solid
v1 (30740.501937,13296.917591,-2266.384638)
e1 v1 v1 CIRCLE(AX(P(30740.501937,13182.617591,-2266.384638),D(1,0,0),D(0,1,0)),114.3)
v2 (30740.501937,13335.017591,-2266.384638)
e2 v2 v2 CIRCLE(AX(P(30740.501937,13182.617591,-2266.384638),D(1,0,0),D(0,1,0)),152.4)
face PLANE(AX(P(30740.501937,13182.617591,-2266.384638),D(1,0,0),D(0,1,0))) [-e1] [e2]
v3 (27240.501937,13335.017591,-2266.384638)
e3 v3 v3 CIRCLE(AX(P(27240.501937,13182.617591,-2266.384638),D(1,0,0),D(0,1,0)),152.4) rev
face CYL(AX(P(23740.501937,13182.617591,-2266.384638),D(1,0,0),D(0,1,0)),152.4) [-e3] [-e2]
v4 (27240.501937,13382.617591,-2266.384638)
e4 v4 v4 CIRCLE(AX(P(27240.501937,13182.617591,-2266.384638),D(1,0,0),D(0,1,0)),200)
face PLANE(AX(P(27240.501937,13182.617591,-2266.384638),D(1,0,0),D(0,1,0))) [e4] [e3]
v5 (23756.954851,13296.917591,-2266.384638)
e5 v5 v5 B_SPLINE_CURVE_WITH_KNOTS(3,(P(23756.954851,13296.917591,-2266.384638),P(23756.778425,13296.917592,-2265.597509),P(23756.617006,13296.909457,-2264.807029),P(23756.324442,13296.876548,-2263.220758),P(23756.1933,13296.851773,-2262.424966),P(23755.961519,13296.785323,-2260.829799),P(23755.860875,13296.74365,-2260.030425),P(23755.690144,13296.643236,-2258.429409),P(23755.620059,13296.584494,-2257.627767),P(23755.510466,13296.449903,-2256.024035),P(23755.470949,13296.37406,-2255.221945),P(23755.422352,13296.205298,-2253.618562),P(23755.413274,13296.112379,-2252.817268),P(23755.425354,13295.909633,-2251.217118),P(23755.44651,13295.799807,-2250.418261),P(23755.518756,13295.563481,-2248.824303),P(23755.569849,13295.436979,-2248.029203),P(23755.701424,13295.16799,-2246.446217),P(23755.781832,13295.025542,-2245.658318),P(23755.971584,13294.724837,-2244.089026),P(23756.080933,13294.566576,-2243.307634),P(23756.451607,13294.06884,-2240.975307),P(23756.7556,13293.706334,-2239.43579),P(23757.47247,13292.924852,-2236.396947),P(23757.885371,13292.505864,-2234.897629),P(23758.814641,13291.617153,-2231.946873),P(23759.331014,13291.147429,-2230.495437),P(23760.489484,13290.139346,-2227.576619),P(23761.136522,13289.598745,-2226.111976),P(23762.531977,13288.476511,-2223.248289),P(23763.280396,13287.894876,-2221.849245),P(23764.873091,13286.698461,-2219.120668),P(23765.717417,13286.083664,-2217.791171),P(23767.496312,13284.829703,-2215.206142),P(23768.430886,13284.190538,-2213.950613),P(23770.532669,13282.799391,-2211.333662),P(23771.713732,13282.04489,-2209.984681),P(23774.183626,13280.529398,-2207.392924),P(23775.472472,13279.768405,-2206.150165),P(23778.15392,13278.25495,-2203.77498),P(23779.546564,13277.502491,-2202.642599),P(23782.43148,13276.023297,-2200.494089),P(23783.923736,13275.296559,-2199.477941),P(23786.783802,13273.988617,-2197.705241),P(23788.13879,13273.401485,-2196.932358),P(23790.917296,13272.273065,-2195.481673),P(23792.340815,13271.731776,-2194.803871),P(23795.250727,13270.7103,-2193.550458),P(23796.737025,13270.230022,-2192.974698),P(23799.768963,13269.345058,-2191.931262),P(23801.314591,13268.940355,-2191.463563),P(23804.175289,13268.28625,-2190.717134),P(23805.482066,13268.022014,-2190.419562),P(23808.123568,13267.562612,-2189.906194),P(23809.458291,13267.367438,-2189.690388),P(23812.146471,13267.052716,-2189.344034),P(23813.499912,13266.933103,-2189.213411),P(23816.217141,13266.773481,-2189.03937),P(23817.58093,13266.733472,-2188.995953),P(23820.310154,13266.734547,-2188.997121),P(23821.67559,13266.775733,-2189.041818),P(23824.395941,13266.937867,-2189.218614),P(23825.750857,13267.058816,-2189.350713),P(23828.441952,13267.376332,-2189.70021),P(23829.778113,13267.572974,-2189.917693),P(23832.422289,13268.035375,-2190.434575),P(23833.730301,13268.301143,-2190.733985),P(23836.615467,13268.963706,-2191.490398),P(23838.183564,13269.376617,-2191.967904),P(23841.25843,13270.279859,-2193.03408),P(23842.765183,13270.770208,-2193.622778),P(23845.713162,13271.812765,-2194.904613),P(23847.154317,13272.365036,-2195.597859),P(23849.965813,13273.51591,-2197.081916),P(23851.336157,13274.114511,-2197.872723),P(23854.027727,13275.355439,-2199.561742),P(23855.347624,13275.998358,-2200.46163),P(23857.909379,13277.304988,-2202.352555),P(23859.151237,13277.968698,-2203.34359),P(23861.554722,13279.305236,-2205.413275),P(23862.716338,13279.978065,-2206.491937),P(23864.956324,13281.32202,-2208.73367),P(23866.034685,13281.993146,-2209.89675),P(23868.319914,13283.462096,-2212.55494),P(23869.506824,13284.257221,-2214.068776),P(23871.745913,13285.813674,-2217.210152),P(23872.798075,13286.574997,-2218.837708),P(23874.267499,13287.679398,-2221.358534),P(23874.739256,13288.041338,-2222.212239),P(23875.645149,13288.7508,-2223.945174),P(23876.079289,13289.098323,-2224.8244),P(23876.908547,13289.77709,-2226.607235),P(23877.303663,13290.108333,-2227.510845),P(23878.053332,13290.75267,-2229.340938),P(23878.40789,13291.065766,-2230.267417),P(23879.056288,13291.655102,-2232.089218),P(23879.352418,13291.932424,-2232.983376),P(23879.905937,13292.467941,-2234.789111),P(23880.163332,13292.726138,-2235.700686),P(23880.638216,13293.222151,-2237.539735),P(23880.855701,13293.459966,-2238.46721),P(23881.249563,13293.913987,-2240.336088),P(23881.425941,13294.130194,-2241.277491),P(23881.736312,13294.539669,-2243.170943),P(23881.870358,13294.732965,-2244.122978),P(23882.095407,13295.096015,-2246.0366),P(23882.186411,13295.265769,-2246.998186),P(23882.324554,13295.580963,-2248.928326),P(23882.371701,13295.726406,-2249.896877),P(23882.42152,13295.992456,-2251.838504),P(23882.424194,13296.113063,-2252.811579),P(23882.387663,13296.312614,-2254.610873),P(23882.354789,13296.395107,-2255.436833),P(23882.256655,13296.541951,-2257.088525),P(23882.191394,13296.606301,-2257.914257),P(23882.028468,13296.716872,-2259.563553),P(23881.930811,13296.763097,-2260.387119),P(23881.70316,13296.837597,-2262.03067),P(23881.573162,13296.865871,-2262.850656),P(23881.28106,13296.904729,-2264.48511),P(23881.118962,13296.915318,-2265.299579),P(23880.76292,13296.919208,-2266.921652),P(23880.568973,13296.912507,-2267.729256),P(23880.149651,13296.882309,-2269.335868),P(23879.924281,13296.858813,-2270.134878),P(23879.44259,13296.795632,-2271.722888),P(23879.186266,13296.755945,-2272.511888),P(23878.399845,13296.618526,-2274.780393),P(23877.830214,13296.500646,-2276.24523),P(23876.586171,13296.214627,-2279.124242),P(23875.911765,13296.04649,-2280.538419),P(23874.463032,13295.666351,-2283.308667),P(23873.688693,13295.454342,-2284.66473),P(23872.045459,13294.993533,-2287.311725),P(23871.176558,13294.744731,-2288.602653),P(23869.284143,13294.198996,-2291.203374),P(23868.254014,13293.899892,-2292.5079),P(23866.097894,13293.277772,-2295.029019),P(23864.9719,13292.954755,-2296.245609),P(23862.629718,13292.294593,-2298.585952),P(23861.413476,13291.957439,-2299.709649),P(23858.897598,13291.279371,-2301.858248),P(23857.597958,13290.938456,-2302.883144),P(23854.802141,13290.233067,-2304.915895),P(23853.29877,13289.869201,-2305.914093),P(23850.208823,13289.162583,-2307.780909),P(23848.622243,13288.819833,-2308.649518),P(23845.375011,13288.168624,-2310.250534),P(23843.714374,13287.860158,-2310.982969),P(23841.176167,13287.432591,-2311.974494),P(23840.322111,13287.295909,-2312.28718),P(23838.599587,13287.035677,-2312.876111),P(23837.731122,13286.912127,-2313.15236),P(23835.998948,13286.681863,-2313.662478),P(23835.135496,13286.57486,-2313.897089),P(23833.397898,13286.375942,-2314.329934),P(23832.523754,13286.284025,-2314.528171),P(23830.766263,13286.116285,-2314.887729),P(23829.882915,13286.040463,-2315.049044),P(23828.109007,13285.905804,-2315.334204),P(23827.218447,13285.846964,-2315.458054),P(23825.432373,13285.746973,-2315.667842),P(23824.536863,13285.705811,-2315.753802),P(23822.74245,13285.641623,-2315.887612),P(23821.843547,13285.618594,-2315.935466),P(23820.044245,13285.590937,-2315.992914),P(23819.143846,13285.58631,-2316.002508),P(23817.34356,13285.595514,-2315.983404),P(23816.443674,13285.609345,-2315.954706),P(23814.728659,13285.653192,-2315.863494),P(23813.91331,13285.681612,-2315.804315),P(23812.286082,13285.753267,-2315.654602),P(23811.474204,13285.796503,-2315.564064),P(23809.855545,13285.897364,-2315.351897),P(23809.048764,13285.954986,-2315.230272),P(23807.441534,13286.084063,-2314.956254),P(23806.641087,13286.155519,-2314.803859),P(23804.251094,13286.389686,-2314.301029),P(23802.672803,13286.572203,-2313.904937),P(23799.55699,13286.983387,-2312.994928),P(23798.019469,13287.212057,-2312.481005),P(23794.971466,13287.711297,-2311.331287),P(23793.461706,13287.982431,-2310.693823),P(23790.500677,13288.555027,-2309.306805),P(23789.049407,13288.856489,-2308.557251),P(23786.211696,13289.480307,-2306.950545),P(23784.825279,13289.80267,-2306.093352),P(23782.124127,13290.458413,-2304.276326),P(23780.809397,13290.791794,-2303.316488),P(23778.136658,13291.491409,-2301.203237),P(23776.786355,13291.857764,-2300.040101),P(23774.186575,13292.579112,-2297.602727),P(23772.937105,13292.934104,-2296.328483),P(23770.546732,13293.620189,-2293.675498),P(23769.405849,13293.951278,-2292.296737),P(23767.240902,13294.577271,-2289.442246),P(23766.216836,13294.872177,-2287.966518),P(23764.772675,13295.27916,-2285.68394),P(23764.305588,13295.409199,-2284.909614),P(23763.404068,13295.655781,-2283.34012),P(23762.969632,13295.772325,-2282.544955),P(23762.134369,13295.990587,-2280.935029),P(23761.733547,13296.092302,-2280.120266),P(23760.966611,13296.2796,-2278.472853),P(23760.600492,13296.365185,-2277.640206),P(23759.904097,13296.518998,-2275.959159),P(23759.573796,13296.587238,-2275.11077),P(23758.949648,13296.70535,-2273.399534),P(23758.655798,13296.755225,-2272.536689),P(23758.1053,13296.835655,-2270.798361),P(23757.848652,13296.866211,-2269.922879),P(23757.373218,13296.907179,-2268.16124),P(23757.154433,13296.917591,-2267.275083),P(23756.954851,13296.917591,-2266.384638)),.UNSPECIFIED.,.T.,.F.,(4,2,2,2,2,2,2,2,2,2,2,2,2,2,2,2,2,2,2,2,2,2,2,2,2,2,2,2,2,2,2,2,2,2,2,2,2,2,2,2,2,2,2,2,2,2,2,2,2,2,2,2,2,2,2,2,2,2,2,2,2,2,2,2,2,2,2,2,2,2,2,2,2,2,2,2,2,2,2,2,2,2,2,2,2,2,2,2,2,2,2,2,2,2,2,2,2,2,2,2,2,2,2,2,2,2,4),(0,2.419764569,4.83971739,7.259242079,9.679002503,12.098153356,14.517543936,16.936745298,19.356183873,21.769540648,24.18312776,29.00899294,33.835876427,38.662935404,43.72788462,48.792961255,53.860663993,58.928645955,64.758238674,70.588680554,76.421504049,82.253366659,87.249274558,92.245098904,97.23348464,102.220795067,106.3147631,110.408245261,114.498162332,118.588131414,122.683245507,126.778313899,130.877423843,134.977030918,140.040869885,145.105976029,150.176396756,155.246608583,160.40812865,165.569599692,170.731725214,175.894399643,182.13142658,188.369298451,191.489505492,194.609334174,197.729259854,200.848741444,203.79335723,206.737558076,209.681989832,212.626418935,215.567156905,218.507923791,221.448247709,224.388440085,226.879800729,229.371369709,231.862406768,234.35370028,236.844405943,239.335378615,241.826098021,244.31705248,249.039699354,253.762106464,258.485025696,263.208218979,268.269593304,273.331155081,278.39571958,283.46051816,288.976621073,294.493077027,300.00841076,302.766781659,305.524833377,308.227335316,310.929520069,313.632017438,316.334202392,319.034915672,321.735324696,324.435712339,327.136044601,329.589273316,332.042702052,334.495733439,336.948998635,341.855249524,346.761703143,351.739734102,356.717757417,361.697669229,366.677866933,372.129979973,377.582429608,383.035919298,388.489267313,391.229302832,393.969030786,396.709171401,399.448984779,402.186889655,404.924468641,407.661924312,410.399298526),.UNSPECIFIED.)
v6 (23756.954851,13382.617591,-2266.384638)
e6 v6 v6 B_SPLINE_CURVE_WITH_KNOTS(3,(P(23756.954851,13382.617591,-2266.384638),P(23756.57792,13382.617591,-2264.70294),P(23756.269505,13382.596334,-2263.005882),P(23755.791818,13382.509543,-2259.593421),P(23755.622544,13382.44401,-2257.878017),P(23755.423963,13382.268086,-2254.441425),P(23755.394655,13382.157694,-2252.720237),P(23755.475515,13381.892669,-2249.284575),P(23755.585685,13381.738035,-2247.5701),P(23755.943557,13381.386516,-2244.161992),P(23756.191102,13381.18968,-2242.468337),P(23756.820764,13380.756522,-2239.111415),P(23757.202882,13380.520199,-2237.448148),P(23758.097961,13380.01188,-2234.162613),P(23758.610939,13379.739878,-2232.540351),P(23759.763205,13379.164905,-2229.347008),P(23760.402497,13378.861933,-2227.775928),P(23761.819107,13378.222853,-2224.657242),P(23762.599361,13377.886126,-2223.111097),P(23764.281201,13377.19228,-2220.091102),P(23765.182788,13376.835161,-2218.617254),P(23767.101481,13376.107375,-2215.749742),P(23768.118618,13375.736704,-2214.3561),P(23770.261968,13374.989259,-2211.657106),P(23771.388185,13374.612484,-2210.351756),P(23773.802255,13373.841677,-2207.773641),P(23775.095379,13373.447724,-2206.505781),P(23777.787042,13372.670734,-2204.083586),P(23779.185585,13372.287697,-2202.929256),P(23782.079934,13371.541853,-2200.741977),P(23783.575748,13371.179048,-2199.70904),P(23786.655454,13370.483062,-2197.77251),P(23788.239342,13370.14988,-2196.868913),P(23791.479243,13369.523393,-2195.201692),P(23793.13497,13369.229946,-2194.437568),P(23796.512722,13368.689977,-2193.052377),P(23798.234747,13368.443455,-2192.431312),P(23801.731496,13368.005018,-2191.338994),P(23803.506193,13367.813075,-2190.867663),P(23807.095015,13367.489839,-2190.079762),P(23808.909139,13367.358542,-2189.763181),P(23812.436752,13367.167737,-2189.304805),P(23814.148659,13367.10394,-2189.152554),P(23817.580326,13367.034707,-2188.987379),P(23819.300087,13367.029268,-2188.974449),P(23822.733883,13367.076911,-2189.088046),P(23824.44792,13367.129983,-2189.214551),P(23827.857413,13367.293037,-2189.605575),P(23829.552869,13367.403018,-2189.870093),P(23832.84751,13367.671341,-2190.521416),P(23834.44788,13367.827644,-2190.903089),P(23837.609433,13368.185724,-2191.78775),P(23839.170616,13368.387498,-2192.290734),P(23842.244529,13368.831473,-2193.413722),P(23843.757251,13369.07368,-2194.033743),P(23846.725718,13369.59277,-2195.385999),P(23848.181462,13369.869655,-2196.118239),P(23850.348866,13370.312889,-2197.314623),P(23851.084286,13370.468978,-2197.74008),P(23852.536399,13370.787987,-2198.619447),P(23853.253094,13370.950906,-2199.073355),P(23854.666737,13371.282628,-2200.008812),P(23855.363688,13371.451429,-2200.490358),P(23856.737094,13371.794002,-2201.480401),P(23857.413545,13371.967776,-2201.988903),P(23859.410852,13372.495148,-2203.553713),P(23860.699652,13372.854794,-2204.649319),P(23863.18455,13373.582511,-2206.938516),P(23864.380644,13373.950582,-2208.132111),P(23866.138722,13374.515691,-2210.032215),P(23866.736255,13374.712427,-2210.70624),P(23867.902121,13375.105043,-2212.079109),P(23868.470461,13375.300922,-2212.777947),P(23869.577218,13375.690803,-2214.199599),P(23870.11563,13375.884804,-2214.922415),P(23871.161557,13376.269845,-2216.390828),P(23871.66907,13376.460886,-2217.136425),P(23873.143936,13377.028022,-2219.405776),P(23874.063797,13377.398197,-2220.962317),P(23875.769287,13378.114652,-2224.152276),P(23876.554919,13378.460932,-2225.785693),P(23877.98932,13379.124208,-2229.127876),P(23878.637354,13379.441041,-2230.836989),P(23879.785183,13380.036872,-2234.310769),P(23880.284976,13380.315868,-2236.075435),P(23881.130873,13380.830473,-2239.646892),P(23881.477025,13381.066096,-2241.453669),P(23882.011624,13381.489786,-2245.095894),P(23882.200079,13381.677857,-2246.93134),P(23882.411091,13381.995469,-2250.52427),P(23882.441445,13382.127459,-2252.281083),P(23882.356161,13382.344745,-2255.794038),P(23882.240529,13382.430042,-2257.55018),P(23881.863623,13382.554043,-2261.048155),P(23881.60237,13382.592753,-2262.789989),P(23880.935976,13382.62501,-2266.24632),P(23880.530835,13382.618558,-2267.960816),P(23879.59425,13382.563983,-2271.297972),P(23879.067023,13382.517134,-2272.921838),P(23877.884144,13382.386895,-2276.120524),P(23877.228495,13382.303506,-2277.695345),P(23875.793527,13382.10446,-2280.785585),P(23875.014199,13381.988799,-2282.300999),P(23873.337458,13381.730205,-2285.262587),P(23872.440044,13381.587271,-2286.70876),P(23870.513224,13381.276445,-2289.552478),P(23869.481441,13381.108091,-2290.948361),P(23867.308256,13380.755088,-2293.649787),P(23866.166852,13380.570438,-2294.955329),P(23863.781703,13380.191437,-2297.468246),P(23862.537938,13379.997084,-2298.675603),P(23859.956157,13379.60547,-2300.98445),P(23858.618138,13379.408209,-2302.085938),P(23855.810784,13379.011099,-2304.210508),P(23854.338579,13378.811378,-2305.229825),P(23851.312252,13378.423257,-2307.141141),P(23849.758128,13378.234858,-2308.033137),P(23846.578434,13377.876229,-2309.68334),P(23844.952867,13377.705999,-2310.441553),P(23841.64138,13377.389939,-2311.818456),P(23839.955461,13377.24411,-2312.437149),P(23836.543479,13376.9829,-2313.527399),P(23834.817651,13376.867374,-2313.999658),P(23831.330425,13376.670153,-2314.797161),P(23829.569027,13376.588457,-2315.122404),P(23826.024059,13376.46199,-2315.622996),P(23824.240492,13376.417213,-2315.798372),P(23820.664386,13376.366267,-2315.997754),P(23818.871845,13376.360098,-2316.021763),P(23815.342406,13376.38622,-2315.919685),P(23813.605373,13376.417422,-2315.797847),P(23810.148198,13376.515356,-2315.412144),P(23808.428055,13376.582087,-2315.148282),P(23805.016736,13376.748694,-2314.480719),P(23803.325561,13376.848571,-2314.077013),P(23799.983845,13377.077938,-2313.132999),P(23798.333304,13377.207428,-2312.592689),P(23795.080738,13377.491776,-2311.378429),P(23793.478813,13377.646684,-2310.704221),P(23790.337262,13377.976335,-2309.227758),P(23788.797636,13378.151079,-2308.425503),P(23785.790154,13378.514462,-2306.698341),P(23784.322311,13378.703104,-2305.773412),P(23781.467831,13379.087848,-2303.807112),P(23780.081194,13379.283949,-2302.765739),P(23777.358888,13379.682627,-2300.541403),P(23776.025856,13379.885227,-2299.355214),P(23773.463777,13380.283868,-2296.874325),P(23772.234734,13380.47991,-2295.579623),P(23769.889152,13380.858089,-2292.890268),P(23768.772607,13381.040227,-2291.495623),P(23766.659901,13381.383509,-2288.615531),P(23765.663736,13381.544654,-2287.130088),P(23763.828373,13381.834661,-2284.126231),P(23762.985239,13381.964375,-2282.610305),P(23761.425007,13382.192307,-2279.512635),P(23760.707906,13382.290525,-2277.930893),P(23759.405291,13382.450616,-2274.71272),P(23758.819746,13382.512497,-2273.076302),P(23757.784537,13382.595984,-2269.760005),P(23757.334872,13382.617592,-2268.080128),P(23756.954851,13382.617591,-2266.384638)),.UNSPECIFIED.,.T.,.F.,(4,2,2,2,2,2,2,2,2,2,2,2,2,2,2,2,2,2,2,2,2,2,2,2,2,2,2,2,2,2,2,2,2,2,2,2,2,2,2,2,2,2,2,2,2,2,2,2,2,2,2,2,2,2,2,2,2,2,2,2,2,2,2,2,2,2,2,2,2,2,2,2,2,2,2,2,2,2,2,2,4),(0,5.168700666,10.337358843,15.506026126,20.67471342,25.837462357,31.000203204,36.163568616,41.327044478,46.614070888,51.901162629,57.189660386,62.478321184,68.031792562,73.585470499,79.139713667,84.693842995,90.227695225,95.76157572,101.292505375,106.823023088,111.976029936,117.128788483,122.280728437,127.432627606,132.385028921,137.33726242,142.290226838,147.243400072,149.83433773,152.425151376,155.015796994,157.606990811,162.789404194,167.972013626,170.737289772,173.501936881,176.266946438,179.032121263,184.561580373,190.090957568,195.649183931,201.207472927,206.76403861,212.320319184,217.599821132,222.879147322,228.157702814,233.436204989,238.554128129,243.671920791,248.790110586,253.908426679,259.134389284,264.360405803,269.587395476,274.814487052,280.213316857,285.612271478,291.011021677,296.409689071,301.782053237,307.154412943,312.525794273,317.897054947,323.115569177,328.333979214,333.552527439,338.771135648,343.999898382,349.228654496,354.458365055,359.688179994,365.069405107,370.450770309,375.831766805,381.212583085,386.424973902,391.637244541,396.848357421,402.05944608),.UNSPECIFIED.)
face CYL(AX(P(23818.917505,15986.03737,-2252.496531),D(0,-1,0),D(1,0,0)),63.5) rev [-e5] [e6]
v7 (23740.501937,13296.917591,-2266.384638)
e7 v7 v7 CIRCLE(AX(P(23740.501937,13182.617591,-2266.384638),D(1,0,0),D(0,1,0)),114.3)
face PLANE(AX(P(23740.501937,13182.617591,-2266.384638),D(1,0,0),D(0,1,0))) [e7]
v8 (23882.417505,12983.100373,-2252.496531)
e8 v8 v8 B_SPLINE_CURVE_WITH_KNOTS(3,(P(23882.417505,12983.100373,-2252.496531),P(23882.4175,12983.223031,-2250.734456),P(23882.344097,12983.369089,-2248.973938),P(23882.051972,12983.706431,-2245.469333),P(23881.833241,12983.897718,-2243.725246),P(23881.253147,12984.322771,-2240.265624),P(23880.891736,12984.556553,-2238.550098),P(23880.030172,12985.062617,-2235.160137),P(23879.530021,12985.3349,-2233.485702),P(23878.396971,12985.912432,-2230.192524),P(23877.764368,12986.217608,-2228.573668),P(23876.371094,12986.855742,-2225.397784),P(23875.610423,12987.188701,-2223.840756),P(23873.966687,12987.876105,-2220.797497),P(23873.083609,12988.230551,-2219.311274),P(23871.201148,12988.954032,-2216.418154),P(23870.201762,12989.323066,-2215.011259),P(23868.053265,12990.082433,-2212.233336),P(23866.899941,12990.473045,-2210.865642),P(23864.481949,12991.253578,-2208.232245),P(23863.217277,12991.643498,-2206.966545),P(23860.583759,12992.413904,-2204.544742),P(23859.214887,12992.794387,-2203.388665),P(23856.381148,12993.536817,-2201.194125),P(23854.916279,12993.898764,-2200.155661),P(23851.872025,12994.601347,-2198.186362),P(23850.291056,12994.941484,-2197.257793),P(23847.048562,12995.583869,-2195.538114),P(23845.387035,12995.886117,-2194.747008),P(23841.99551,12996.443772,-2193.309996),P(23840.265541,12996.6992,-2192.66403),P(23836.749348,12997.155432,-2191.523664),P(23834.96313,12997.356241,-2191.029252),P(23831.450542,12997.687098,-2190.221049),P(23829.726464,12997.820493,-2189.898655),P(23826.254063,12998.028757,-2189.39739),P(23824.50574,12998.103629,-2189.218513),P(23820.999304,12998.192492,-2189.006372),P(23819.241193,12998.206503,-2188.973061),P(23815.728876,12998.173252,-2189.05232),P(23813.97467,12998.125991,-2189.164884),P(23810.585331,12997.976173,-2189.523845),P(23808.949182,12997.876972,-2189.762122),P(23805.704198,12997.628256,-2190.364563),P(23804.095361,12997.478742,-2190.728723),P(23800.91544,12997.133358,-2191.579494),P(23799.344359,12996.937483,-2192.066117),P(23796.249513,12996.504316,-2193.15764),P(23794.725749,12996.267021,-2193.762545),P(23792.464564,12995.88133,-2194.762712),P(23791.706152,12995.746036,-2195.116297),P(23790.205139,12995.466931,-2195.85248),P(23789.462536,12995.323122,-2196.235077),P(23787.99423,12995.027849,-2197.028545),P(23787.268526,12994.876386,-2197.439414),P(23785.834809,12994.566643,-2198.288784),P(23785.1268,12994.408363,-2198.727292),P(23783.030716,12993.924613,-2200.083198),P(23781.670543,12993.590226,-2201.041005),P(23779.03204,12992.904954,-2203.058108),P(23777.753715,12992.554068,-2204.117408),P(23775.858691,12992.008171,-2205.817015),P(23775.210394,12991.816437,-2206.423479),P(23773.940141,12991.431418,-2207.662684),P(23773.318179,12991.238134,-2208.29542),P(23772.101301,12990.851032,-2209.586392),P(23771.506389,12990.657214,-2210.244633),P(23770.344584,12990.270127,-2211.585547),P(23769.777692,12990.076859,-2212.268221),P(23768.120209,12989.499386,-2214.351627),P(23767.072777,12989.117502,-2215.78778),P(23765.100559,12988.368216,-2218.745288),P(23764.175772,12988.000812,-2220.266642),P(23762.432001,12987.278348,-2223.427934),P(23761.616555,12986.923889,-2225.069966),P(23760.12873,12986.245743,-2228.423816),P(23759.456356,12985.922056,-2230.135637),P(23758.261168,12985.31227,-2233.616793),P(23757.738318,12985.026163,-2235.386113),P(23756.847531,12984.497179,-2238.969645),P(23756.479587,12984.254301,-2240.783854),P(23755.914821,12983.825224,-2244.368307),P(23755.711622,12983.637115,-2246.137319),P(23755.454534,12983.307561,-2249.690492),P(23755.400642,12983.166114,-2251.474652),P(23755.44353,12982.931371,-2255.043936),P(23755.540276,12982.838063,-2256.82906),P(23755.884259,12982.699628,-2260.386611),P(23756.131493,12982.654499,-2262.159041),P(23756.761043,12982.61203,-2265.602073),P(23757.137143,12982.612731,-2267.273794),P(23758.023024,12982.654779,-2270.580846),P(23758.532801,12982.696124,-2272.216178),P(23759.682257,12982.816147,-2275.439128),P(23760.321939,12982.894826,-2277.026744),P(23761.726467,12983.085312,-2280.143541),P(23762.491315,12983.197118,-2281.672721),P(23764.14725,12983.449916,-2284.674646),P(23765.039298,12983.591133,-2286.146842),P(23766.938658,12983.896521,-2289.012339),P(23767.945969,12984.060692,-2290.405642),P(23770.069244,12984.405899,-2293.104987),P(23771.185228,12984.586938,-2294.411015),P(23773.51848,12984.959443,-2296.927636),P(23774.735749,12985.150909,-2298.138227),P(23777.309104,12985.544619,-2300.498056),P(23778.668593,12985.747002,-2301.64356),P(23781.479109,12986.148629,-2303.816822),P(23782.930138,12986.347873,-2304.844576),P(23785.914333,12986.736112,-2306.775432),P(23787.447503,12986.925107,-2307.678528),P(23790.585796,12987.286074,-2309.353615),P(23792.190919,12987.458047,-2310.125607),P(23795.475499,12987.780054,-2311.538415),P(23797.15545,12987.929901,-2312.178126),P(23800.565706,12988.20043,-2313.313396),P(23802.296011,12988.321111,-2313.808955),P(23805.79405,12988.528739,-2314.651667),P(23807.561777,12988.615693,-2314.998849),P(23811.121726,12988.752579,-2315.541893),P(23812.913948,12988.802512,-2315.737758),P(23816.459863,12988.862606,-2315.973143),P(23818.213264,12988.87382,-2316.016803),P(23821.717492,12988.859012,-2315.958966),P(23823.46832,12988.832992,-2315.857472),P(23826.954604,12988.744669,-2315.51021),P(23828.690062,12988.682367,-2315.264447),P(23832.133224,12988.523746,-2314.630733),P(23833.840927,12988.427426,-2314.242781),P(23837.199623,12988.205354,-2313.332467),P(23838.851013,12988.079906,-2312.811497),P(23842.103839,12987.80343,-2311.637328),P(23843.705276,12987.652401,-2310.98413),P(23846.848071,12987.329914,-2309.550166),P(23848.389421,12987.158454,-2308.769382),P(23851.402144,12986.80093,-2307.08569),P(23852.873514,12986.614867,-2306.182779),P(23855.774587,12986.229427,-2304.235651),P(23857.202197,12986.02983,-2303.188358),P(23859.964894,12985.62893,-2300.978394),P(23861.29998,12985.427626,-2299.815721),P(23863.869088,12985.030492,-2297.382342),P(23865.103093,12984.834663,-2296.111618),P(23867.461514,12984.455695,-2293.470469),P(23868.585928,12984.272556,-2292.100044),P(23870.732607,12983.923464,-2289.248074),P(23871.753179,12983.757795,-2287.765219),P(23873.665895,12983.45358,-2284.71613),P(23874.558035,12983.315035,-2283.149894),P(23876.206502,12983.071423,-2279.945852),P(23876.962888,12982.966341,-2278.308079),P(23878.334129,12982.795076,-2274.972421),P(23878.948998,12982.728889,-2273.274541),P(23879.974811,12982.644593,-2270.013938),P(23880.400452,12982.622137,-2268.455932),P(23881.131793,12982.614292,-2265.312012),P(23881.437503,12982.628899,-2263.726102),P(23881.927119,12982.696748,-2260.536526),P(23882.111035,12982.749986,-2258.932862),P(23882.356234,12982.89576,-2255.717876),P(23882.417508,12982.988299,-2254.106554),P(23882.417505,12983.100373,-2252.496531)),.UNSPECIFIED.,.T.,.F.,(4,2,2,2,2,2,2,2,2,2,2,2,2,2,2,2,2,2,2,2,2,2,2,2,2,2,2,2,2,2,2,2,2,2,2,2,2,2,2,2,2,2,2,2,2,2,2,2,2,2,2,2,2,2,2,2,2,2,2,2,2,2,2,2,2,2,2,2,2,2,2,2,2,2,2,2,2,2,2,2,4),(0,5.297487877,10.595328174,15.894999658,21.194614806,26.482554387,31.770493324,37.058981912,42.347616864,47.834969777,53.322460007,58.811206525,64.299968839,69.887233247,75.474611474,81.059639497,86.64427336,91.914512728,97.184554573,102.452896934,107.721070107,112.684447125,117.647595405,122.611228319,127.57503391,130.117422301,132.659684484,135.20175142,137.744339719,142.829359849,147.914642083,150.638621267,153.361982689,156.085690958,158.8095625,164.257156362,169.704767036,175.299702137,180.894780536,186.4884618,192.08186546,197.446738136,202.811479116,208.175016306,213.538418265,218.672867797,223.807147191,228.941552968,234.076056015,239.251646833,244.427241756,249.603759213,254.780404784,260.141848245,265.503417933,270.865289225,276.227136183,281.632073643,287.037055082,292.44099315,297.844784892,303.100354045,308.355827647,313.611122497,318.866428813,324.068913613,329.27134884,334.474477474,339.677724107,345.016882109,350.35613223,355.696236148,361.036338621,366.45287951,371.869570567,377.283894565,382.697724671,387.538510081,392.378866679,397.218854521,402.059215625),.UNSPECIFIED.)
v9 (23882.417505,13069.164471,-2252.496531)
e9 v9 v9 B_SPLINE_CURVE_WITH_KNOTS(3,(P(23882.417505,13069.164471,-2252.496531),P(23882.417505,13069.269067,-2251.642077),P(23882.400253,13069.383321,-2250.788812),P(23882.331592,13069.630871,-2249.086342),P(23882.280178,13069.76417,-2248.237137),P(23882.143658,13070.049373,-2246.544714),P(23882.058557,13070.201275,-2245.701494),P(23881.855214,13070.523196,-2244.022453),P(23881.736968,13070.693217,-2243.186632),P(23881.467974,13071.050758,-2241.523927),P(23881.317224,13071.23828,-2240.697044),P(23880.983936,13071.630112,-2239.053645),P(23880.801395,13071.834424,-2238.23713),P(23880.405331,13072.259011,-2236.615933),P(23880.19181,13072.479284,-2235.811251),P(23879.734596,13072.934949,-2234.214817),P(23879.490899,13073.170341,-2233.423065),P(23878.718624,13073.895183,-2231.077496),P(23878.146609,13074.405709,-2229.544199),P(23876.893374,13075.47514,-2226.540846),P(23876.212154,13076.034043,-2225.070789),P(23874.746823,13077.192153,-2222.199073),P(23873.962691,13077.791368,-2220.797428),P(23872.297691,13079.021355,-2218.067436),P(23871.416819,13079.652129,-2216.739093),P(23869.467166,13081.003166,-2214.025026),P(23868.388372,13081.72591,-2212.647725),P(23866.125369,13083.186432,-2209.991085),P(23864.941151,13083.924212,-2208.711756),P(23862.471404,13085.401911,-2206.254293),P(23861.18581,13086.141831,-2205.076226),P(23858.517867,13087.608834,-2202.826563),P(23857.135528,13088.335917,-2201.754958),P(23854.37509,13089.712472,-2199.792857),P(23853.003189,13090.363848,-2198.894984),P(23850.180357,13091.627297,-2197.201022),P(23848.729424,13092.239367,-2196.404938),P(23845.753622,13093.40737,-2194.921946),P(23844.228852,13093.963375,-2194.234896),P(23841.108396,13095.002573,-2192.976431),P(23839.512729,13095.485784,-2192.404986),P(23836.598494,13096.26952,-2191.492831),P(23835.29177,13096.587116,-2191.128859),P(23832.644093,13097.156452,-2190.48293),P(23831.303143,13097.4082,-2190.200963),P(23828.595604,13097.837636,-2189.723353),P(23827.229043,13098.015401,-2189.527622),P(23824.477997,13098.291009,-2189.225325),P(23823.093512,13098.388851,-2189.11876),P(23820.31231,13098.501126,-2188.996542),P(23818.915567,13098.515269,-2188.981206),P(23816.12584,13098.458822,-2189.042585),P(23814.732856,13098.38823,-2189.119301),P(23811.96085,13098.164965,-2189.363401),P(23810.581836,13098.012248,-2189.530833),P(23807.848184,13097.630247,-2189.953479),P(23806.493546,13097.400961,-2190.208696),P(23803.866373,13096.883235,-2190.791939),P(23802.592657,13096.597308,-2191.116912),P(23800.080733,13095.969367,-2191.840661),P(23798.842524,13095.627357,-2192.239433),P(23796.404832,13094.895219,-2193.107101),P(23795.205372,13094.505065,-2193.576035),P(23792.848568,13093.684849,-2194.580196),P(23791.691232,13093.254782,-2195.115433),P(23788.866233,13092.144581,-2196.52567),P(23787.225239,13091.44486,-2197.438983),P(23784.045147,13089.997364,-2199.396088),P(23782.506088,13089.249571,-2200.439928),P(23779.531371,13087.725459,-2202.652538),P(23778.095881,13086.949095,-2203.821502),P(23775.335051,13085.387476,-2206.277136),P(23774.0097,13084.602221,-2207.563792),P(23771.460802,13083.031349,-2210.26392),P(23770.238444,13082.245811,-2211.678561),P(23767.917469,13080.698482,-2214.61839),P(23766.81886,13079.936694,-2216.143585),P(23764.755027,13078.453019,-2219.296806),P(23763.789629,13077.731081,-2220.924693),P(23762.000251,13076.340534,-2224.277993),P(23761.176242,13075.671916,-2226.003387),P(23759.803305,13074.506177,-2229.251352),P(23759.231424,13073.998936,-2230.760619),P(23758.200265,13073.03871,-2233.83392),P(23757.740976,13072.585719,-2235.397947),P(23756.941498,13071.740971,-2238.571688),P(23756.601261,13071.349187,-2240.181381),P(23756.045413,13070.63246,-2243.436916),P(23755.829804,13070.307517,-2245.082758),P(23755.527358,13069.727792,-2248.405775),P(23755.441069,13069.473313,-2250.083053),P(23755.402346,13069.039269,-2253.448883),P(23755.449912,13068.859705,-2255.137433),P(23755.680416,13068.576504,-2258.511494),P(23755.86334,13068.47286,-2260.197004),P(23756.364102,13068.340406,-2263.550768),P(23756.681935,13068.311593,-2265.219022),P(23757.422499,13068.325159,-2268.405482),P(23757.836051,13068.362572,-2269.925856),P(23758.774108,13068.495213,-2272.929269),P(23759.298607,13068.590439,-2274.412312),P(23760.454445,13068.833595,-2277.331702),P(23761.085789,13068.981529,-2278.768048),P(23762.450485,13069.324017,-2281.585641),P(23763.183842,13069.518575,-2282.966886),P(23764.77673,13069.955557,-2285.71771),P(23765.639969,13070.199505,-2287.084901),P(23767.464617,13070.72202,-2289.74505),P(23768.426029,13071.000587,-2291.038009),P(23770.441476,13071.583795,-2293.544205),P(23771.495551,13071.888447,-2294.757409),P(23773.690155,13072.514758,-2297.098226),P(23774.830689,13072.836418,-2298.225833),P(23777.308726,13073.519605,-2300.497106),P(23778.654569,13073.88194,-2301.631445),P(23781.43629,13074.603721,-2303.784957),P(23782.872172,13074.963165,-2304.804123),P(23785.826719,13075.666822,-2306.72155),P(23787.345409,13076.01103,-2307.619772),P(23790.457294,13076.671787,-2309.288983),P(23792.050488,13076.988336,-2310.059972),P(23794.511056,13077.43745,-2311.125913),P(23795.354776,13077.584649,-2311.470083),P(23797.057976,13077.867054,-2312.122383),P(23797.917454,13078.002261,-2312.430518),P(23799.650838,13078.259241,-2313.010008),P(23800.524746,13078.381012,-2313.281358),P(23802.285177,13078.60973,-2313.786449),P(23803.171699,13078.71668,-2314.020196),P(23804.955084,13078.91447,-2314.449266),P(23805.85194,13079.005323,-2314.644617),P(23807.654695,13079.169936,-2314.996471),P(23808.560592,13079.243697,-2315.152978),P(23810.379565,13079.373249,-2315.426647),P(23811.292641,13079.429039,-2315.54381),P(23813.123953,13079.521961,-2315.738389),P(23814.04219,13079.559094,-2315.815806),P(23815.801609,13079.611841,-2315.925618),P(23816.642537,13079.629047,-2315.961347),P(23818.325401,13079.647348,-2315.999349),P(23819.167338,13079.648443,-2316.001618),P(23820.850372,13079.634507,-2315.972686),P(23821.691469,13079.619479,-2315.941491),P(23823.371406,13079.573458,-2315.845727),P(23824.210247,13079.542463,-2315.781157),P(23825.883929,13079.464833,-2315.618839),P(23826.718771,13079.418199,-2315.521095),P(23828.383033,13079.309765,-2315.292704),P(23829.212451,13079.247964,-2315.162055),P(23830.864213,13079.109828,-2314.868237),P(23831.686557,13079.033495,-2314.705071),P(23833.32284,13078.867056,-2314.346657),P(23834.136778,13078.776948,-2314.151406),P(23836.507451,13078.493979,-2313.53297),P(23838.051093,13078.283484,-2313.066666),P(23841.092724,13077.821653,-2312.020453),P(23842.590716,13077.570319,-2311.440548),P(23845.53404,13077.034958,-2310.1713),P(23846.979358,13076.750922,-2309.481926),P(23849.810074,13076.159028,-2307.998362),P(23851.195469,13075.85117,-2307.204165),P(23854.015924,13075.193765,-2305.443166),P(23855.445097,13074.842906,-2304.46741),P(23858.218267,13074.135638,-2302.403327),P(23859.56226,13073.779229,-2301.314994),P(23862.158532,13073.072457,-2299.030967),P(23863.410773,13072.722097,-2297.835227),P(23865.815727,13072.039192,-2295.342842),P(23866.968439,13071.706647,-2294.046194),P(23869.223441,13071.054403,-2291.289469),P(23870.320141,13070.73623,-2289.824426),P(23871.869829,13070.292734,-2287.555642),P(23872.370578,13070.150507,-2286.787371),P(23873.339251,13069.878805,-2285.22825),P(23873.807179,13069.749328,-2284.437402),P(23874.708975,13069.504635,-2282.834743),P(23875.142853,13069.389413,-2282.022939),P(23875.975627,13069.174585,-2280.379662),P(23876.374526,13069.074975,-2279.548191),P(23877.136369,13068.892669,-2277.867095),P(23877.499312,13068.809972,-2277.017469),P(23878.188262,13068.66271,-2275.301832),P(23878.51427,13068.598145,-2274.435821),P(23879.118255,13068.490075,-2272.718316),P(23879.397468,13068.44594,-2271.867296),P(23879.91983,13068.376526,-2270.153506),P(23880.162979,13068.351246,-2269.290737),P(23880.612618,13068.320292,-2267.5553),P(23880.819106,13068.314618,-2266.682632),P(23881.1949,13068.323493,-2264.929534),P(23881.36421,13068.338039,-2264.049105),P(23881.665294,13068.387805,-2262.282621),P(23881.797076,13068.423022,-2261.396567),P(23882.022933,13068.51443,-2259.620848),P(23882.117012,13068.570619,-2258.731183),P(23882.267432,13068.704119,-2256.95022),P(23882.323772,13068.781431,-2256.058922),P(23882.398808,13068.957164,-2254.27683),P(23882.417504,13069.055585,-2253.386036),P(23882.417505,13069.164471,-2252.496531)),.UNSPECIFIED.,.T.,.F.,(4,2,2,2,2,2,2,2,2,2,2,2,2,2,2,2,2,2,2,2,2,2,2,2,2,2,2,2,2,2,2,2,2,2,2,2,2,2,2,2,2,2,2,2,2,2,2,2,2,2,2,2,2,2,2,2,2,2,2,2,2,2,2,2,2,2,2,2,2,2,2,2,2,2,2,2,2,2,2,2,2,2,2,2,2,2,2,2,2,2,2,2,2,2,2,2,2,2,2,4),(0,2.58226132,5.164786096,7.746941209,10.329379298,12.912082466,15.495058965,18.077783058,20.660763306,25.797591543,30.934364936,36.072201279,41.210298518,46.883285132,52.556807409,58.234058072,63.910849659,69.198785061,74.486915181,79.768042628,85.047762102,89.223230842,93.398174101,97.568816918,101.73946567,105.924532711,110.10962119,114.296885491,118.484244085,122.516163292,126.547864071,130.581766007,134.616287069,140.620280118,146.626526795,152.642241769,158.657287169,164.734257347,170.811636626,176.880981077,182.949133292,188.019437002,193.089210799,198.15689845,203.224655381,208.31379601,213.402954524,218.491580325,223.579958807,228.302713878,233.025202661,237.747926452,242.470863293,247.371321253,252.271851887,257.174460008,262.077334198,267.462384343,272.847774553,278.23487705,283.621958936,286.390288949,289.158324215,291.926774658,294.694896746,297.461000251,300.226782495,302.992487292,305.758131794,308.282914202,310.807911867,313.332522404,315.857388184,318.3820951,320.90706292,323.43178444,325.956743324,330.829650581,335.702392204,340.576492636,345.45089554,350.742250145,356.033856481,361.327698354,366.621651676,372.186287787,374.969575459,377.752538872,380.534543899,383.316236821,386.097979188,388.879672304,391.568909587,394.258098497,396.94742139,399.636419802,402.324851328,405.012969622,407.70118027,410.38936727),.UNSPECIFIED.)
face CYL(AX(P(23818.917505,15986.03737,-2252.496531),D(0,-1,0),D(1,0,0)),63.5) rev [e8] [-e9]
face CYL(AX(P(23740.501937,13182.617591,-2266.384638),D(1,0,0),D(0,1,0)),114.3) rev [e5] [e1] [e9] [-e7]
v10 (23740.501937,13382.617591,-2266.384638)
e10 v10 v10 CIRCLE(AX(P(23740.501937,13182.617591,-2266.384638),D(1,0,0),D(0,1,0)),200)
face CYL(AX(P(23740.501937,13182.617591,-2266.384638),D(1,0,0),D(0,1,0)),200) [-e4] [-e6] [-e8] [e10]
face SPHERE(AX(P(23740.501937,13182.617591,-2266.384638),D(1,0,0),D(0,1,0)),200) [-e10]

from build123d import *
from build123d.topology import SkipClean

# Parameters (mm, degrees)
SWEEP1_PROFILE_R   = 152.4
SWEEP2_PROFILE_R   = 200
SKETCH99_R         = 114.3
CUT_EXTRUDE1_DEPTH = 7000
SKETCH140_R        = 63.5
CUT_EXTRUDE2_DEPTH = 1750


with BuildPart() as part:
    # Sweep1: sweep along a path in Sketch2
    with BuildLine(Plane(origin=(1e-09, 13182.61759136, 0), x_dir=(1, 0, 0), z_dir=(0, 1, 0))) as sweep1_path:
        Line((23740.501936611, 2266.384637986), (30740.501936611, 2266.384637986))
    # Sweep1 profile (on start of the path) → Sweep1 (sweep)
    with BuildSketch(Plane(origin=(23740.501936612, 13182.617591358, -2266.384637986), x_dir=(0, 1, 0), z_dir=(1, 0, 0))):
        Circle(SWEEP1_PROFILE_R)
    sweep(path=sweep1_path.line)

    # Sweep2: sweep along a path in Sketch31
    with BuildLine(Plane(origin=(1e-09, 13182.61759136, 0), x_dir=(1, 0, 0), z_dir=(0, 1, 0))) as sweep2_path:
        Line((23740.501936611, 2266.384637986), (27240.501936611, 2266.384637986))
    # Sweep2 profile (on start of the path) → Sweep2 (sweep)
    with BuildSketch(Plane(origin=(23740.501936612, 13182.617591358, -2266.384637986), x_dir=(0, 1, 0), z_dir=(1, 0, 0))):
        Circle(SWEEP2_PROFILE_R)
    sweep(path=sweep2_path.line)

    # Sketch66 → Revolve4 (revolve)
    with SkipClean():  # the faces are left unmerged after this step: merging them gives an invalid solid
        with BuildSketch(Plane(origin=(1e-09, 13182.61759136, 0), x_dir=(1, 0, 0), z_dir=(0, 1, 0))):
            with BuildLine():
                Line((23740.501936611, 2466.384637986), (23740.501936611, 2066.384637986))
                ThreePointArc((23740.501936611, 2066.384637986), (23540.501936611, 2266.384637986), (23740.501936611, 2466.384637986))
            make_face()
        revolve(axis=Axis((23740.501936612, 13182.617591358, -2466.384637986), (0, 0, 1)))

    # Sketch99 → Cut-Extrude1 (cut)
    with SkipClean():  # the faces are left unmerged after this step: merging them gives an invalid solid
        with BuildSketch(Plane(origin=(30740.501936611, -2e-09, 0), x_dir=(0, 0, -1), z_dir=(1, 0, 0))):
            with Locations((2266.384637986, 13182.61759136)):
                Circle(SKETCH99_R)
        extrude(amount=-CUT_EXTRUDE1_DEPTH, mode=Mode.SUBTRACT)

    # Sketch140 → Cut-Extrude2 (cut, symmetric)
    with SkipClean():  # the faces are left unmerged after this step: merging them gives an invalid solid
        with BuildSketch(Plane(origin=(187.795896922, 14236.037369872, -4220.063365883), x_dir=(0.9846757772381061, -1.714887253549652e-14, 0.1743949933929635), z_dir=(0, -1, 0))):
            with Locations((23612.126841123, -2183.733894313)):
                Circle(SKETCH140_R)
        extrude(amount=CUT_EXTRUDE2_DEPTH, both=True, mode=Mode.SUBTRACT)


solid = part.part
